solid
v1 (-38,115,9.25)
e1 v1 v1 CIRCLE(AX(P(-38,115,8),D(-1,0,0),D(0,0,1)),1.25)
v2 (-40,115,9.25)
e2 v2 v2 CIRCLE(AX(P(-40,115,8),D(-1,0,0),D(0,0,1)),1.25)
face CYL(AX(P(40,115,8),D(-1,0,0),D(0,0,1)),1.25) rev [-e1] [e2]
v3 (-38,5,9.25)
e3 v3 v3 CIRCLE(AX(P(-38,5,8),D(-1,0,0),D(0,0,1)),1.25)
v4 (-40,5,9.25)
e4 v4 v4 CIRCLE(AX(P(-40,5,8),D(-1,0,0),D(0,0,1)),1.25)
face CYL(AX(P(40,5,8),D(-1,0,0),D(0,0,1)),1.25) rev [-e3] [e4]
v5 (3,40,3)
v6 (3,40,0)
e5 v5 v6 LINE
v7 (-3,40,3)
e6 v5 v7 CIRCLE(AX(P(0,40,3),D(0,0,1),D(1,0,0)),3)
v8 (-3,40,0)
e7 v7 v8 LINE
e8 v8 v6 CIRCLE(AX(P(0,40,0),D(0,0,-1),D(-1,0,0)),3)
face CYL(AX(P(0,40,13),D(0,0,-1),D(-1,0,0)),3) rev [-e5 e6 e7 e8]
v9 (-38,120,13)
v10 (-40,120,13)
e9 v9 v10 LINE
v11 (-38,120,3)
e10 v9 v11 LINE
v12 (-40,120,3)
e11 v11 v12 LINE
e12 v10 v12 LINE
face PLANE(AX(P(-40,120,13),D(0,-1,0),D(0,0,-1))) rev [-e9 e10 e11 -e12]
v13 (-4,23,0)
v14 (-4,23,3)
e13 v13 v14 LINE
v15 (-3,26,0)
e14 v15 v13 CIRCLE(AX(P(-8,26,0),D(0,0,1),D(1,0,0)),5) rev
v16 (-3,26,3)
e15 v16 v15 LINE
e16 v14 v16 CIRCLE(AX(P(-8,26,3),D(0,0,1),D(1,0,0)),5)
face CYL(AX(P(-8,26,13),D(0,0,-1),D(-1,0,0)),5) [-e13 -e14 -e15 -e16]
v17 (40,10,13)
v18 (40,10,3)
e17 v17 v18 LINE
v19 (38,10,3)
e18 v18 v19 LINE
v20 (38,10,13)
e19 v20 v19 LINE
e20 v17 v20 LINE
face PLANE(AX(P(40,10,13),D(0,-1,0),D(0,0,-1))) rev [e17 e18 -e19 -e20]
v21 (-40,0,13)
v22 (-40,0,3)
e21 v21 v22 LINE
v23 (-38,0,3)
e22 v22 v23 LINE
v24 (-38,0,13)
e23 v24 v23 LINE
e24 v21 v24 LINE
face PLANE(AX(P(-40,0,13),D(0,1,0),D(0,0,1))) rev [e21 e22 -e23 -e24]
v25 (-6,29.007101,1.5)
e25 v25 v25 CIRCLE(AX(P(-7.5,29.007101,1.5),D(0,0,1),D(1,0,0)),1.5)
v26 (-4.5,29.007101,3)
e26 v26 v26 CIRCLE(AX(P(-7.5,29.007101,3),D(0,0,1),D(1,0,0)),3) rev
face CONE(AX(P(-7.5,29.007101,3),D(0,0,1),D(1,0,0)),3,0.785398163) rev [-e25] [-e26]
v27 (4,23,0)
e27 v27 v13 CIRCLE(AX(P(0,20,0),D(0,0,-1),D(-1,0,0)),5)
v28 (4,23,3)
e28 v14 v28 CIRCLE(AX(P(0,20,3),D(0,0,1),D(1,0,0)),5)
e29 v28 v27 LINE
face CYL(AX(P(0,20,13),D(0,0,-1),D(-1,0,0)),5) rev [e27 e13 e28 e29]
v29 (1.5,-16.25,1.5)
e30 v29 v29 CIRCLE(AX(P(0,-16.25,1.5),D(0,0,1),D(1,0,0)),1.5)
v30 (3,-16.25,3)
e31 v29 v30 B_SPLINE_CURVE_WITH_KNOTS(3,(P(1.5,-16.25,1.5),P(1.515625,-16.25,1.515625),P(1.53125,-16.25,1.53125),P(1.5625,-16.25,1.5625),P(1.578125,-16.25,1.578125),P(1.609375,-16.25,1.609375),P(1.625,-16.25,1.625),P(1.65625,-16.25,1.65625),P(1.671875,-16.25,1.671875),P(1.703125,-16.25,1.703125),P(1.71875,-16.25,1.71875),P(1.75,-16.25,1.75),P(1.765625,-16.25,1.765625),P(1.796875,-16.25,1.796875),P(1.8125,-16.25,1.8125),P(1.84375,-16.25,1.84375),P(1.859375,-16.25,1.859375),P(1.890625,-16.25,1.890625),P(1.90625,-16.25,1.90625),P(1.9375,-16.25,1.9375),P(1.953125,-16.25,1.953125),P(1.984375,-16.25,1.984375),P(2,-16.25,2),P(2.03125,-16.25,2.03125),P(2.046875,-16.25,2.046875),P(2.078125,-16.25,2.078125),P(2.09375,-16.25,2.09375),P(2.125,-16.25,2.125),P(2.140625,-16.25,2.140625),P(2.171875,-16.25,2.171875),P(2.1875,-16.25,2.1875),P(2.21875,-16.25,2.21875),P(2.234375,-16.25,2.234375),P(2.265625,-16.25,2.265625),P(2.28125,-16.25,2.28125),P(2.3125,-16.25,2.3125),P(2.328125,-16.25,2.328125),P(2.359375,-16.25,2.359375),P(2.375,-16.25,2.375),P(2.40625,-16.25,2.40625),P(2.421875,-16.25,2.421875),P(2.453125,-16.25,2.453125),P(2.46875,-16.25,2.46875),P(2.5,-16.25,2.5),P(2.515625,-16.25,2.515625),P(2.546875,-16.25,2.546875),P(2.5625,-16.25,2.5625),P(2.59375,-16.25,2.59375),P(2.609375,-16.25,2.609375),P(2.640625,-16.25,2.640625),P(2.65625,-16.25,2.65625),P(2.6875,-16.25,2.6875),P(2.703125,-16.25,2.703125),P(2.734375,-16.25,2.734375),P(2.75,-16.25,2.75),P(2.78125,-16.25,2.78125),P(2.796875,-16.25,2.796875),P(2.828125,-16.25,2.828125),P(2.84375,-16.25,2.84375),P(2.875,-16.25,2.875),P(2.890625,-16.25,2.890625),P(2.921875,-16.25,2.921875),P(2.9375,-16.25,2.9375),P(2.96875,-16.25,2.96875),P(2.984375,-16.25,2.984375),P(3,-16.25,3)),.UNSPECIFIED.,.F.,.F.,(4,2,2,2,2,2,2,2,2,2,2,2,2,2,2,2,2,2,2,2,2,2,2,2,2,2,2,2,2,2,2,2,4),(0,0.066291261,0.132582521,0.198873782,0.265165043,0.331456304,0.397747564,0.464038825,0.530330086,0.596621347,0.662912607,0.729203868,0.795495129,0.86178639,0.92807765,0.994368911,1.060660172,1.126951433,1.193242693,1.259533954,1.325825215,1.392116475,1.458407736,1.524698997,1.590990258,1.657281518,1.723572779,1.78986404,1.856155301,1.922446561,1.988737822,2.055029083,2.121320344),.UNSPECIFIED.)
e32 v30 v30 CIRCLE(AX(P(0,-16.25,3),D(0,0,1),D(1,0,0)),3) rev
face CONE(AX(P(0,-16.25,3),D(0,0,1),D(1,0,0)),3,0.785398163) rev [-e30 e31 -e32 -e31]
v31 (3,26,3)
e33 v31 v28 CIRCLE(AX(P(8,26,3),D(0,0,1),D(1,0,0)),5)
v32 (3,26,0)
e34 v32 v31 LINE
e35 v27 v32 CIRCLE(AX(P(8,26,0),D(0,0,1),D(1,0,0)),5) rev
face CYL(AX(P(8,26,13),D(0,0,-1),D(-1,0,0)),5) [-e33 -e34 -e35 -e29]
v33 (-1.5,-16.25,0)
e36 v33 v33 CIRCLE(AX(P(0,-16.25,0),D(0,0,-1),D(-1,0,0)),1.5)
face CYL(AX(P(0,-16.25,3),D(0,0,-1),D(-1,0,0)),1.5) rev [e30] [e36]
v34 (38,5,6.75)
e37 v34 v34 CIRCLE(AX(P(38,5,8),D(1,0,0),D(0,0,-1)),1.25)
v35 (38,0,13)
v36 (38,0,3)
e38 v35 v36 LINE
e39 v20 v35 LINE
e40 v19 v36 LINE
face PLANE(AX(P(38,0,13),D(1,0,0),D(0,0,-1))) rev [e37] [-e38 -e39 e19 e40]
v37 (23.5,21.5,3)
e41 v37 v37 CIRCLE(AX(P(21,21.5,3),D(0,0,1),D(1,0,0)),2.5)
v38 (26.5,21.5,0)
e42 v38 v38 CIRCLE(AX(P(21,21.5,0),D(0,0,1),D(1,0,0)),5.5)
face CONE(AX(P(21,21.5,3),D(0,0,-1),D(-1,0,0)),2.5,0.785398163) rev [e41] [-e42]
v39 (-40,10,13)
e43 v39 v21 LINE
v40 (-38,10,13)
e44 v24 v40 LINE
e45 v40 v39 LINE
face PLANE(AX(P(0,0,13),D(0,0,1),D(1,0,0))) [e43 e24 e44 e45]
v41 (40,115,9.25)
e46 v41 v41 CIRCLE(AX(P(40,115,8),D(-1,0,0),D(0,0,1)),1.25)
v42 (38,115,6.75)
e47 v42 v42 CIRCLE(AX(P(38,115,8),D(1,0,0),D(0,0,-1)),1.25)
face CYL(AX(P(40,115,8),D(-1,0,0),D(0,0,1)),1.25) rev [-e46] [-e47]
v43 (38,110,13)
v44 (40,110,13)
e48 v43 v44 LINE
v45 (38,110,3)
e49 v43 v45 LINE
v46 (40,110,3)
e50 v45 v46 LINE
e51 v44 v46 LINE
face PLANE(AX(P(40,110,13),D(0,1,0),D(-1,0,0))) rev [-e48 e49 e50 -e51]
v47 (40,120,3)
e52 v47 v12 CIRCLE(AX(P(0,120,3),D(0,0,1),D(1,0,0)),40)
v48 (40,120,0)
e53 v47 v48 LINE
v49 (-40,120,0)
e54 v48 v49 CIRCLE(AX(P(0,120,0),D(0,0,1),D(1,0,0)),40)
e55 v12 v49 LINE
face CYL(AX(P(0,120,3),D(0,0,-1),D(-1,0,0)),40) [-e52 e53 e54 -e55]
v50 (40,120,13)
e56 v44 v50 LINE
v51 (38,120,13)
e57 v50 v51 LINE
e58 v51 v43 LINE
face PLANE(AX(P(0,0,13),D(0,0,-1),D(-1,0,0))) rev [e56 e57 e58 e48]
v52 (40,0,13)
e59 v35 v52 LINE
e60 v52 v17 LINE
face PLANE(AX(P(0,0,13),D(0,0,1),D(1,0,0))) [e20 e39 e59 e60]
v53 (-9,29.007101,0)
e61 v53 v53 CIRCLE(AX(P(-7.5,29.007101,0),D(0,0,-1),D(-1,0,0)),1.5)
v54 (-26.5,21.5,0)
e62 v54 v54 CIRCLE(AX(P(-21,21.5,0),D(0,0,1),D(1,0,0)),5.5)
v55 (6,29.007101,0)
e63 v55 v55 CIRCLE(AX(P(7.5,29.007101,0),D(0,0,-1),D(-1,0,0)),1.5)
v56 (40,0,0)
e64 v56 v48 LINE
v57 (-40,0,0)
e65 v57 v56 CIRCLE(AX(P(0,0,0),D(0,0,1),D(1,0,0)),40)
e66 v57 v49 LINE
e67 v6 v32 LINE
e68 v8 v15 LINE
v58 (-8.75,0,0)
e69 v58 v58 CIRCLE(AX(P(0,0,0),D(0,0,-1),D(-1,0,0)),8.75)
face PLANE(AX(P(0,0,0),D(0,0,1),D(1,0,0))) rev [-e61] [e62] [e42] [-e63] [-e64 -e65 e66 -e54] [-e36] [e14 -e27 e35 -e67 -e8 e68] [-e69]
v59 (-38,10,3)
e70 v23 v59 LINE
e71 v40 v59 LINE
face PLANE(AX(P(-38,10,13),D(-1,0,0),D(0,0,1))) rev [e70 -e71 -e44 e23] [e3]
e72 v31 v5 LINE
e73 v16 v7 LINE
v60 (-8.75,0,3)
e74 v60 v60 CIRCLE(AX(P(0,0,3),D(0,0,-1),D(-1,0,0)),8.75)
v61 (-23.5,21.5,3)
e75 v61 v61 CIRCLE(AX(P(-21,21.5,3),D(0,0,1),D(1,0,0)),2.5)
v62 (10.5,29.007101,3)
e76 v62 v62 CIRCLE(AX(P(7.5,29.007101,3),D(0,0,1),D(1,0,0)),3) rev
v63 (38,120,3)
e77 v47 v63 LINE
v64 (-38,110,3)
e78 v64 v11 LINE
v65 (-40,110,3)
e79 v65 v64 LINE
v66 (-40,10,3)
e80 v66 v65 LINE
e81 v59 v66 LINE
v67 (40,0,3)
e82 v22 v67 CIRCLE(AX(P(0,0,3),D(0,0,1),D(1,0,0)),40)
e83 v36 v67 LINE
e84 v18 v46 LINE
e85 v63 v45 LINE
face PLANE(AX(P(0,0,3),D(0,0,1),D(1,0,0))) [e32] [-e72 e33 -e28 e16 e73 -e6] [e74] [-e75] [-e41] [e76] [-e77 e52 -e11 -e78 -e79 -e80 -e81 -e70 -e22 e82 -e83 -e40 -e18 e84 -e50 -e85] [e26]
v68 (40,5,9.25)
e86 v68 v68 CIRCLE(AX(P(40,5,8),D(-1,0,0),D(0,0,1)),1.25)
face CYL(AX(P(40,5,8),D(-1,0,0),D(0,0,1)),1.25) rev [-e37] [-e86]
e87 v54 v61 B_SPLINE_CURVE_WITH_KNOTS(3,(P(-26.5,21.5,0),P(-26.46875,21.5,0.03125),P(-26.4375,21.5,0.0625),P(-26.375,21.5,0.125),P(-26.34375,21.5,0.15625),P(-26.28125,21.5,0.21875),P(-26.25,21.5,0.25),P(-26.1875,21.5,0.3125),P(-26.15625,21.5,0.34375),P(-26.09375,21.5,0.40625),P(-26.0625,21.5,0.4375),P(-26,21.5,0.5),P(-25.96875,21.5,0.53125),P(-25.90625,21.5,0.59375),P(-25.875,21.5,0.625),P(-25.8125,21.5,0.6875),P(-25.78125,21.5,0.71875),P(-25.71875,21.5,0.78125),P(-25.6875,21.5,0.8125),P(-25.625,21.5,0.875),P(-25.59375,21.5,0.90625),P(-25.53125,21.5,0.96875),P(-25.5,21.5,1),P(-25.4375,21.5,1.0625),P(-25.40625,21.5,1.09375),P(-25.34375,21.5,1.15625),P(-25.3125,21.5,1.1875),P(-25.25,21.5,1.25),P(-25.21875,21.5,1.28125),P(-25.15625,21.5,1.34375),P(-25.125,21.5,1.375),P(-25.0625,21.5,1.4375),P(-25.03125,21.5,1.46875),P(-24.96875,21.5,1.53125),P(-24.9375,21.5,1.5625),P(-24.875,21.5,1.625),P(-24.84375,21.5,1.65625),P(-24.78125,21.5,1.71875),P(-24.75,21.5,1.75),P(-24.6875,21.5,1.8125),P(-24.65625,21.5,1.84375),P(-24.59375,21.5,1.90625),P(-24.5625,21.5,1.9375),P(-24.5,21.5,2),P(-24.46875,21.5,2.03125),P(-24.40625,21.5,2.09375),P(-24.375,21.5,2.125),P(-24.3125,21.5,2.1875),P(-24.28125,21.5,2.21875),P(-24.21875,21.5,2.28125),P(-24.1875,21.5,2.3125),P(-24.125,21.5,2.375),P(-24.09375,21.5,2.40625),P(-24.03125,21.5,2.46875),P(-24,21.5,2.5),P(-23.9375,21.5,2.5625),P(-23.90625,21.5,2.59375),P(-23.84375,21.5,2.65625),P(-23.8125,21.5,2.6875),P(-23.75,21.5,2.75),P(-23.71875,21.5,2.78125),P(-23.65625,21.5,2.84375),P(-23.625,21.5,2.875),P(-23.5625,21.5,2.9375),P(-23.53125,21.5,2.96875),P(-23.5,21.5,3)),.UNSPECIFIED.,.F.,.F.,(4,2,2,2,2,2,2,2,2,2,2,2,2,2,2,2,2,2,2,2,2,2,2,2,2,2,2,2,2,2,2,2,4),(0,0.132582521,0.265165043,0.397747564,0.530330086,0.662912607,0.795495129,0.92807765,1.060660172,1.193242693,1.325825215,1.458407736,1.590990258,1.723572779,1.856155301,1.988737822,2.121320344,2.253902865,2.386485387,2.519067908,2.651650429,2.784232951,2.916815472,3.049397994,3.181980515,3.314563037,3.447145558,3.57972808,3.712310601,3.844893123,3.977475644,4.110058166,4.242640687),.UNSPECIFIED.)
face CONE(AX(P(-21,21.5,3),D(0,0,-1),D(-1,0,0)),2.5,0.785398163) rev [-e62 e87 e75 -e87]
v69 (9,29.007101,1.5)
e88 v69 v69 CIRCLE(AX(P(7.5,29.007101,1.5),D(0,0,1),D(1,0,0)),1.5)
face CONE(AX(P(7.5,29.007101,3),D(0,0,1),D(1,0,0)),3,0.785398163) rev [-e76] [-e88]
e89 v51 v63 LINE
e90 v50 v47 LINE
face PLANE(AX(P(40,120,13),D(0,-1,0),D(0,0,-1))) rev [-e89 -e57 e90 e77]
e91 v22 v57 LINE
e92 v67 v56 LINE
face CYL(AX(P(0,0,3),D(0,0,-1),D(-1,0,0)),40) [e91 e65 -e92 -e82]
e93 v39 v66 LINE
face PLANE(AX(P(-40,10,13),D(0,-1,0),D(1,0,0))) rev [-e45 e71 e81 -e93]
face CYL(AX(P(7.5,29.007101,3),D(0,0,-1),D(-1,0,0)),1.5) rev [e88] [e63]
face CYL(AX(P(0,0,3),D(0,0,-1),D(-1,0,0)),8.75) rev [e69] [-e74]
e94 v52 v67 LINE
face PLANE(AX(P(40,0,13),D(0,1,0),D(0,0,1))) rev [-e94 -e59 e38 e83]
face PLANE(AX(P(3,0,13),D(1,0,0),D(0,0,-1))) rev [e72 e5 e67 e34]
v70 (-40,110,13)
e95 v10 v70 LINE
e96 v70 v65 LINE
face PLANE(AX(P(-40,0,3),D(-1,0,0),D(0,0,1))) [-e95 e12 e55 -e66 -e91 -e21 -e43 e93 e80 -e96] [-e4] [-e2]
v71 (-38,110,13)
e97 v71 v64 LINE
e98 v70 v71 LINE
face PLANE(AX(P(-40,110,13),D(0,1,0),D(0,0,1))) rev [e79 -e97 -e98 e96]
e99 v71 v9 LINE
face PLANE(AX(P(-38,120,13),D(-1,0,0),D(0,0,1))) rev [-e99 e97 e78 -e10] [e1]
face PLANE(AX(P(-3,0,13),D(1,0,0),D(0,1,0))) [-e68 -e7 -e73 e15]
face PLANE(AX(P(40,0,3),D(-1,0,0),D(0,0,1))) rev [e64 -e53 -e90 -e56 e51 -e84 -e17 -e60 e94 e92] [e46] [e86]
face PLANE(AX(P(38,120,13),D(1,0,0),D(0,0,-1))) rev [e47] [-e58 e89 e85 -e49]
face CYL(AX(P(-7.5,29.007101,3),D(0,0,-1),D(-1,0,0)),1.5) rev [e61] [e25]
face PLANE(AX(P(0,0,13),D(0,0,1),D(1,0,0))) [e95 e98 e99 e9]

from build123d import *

# Parameters (mm, degrees)
SKETCH3_R           = 40
BOSS_EXTRUDE4_DEPTH = 3
SKETCH6_R           = 1.5
SKETCH6_R_2         = 8.75
CUT_EXTRUDE2_DEPTH  = 165.951508026
CHAMFER1_SIZE       = 1.5
SKETCH12_W          = 2
SKETCH12_H          = 10
BOSS_EXTRUDE7_DEPTH = 10
SKETCH13_R          = 1.25
CUT_EXTRUDE8_DEPTH  = 180.357185527
SKETCH14_R          = 2.5
CUT_EXTRUDE9_DEPTH  = 166.435788148
CHAMFER2_SIZE       = 3
CUT_EXTRUDE10_DEPTH = 166.435788148
FILLET1_R           = 5


with BuildPart() as part:
    # Sketch3 → Boss-Extrude4 (new body)
    with BuildSketch(Plane.XY):
        with BuildLine():
            ThreePointArc((40, 0), (0, 40), (-40, 0))
            Line((-40, 0), (40, 0))
        make_face()
        with BuildLine():
            Line((40, 0), (-40, 0))
            ThreePointArc((-40, 0), (0, -40), (40, 0))
        make_face()
        with BuildLine():
            Line((-40, 120), (-40, 0))
            ThreePointArc((-40, 0), (0, 40), (40, 0))
            Line((40, 0), (40, 120))
            ThreePointArc((40, 120), (0, 80), (-40, 120))
        make_face()
        with Locations((0, 120)):
            Circle(SKETCH3_R)
    extrude(amount=BOSS_EXTRUDE4_DEPTH)

    # Sketch6 → Cut-Extrude2 (cut, through all)
    with BuildSketch(Plane(origin=(0, 0, 0), x_dir=(-1, 0, 0), z_dir=(0, 0, -1))):
        with Locations((-7.5, 29.007101127)):
            Circle(SKETCH6_R)
        with Locations((7.5, 29.007101127)):
            Circle(SKETCH6_R)
        with Locations((0, -16.25)):
            Circle(SKETCH6_R)
        Circle(SKETCH6_R_2)
    extrude(amount=-CUT_EXTRUDE2_DEPTH, mode=Mode.SUBTRACT)

    # Chamfer1
    chamfer1_edges = [part.edges().sort_by_distance(p)[0] for p in [
        (-6, 29.007101127, 3),
        (1.5, -16.25, 3),
        (9, 29.007101127, 3),
    ]]
    chamfer(chamfer1_edges, length=CHAMFER1_SIZE)

    # Sketch12 → Boss-Extrude7 (add)
    with BuildSketch(Plane.XY.offset(3)):
        with Locations((39, 115)):
            Rectangle(SKETCH12_W, SKETCH12_H)
        with Locations((-39, 115)):
            Rectangle(SKETCH12_W, SKETCH12_H)
        with Locations((-39, 5)):
            Rectangle(SKETCH12_W, SKETCH12_H)
        with Locations((39, 5)):
            Rectangle(SKETCH12_W, SKETCH12_H)
    extrude(amount=BOSS_EXTRUDE7_DEPTH)

    # Sketch13 → Cut-Extrude8 (cut, through all)
    with BuildSketch(Plane.ZY.offset(40)):
        with Locations((8, 115)):
            Circle(SKETCH13_R)
        with Locations((8, 5)):
            Circle(SKETCH13_R)
    extrude(amount=-CUT_EXTRUDE8_DEPTH, mode=Mode.SUBTRACT)

    # Sketch14 → Cut-Extrude9 (cut, through all)
    with BuildSketch(Plane(origin=(0, 0, 0), x_dir=(-1, 0, 0), z_dir=(0, 0, -1))):
        with Locations((-21, 21.5)):
            Circle(SKETCH14_R)
        with Locations((21, 21.5)):
            Circle(SKETCH14_R)
    extrude(amount=-CUT_EXTRUDE9_DEPTH, mode=Mode.SUBTRACT)

    # Chamfer2
    chamfer2_edges = [part.edges().sort_by_distance(p)[0] for p in [
        (23.5, 21.5, 0),
        (-18.5, 21.5, 0),
    ]]
    chamfer(chamfer2_edges, length=CHAMFER2_SIZE - 0.0001)  # a hair under: the kernel refuses the full size

    # Sketch9 → Cut-Extrude10 (cut, through all)
    with BuildSketch(Plane(origin=(0, 0, 0), x_dir=(-1, 0, 0), z_dir=(0, 0, -1))):
        with BuildLine():
            ThreePointArc((3, 40), (0, 43), (-3, 40))
            Line((-3, 40), (-3, 24))
            ThreePointArc((-3, 24), (0, 15), (3, 24))
            Line((3, 24), (3, 40))
        make_face()
    extrude(amount=-CUT_EXTRUDE10_DEPTH, mode=Mode.SUBTRACT)

    # Fillet1
    fillet1_edges = [part.edges().sort_by_distance(p)[0] for p in [
        (3, 24, 1.5),
        (-3, 24, 1.5),
    ]]
    fillet(fillet1_edges, radius=FILLET1_R)


solid = part.part
